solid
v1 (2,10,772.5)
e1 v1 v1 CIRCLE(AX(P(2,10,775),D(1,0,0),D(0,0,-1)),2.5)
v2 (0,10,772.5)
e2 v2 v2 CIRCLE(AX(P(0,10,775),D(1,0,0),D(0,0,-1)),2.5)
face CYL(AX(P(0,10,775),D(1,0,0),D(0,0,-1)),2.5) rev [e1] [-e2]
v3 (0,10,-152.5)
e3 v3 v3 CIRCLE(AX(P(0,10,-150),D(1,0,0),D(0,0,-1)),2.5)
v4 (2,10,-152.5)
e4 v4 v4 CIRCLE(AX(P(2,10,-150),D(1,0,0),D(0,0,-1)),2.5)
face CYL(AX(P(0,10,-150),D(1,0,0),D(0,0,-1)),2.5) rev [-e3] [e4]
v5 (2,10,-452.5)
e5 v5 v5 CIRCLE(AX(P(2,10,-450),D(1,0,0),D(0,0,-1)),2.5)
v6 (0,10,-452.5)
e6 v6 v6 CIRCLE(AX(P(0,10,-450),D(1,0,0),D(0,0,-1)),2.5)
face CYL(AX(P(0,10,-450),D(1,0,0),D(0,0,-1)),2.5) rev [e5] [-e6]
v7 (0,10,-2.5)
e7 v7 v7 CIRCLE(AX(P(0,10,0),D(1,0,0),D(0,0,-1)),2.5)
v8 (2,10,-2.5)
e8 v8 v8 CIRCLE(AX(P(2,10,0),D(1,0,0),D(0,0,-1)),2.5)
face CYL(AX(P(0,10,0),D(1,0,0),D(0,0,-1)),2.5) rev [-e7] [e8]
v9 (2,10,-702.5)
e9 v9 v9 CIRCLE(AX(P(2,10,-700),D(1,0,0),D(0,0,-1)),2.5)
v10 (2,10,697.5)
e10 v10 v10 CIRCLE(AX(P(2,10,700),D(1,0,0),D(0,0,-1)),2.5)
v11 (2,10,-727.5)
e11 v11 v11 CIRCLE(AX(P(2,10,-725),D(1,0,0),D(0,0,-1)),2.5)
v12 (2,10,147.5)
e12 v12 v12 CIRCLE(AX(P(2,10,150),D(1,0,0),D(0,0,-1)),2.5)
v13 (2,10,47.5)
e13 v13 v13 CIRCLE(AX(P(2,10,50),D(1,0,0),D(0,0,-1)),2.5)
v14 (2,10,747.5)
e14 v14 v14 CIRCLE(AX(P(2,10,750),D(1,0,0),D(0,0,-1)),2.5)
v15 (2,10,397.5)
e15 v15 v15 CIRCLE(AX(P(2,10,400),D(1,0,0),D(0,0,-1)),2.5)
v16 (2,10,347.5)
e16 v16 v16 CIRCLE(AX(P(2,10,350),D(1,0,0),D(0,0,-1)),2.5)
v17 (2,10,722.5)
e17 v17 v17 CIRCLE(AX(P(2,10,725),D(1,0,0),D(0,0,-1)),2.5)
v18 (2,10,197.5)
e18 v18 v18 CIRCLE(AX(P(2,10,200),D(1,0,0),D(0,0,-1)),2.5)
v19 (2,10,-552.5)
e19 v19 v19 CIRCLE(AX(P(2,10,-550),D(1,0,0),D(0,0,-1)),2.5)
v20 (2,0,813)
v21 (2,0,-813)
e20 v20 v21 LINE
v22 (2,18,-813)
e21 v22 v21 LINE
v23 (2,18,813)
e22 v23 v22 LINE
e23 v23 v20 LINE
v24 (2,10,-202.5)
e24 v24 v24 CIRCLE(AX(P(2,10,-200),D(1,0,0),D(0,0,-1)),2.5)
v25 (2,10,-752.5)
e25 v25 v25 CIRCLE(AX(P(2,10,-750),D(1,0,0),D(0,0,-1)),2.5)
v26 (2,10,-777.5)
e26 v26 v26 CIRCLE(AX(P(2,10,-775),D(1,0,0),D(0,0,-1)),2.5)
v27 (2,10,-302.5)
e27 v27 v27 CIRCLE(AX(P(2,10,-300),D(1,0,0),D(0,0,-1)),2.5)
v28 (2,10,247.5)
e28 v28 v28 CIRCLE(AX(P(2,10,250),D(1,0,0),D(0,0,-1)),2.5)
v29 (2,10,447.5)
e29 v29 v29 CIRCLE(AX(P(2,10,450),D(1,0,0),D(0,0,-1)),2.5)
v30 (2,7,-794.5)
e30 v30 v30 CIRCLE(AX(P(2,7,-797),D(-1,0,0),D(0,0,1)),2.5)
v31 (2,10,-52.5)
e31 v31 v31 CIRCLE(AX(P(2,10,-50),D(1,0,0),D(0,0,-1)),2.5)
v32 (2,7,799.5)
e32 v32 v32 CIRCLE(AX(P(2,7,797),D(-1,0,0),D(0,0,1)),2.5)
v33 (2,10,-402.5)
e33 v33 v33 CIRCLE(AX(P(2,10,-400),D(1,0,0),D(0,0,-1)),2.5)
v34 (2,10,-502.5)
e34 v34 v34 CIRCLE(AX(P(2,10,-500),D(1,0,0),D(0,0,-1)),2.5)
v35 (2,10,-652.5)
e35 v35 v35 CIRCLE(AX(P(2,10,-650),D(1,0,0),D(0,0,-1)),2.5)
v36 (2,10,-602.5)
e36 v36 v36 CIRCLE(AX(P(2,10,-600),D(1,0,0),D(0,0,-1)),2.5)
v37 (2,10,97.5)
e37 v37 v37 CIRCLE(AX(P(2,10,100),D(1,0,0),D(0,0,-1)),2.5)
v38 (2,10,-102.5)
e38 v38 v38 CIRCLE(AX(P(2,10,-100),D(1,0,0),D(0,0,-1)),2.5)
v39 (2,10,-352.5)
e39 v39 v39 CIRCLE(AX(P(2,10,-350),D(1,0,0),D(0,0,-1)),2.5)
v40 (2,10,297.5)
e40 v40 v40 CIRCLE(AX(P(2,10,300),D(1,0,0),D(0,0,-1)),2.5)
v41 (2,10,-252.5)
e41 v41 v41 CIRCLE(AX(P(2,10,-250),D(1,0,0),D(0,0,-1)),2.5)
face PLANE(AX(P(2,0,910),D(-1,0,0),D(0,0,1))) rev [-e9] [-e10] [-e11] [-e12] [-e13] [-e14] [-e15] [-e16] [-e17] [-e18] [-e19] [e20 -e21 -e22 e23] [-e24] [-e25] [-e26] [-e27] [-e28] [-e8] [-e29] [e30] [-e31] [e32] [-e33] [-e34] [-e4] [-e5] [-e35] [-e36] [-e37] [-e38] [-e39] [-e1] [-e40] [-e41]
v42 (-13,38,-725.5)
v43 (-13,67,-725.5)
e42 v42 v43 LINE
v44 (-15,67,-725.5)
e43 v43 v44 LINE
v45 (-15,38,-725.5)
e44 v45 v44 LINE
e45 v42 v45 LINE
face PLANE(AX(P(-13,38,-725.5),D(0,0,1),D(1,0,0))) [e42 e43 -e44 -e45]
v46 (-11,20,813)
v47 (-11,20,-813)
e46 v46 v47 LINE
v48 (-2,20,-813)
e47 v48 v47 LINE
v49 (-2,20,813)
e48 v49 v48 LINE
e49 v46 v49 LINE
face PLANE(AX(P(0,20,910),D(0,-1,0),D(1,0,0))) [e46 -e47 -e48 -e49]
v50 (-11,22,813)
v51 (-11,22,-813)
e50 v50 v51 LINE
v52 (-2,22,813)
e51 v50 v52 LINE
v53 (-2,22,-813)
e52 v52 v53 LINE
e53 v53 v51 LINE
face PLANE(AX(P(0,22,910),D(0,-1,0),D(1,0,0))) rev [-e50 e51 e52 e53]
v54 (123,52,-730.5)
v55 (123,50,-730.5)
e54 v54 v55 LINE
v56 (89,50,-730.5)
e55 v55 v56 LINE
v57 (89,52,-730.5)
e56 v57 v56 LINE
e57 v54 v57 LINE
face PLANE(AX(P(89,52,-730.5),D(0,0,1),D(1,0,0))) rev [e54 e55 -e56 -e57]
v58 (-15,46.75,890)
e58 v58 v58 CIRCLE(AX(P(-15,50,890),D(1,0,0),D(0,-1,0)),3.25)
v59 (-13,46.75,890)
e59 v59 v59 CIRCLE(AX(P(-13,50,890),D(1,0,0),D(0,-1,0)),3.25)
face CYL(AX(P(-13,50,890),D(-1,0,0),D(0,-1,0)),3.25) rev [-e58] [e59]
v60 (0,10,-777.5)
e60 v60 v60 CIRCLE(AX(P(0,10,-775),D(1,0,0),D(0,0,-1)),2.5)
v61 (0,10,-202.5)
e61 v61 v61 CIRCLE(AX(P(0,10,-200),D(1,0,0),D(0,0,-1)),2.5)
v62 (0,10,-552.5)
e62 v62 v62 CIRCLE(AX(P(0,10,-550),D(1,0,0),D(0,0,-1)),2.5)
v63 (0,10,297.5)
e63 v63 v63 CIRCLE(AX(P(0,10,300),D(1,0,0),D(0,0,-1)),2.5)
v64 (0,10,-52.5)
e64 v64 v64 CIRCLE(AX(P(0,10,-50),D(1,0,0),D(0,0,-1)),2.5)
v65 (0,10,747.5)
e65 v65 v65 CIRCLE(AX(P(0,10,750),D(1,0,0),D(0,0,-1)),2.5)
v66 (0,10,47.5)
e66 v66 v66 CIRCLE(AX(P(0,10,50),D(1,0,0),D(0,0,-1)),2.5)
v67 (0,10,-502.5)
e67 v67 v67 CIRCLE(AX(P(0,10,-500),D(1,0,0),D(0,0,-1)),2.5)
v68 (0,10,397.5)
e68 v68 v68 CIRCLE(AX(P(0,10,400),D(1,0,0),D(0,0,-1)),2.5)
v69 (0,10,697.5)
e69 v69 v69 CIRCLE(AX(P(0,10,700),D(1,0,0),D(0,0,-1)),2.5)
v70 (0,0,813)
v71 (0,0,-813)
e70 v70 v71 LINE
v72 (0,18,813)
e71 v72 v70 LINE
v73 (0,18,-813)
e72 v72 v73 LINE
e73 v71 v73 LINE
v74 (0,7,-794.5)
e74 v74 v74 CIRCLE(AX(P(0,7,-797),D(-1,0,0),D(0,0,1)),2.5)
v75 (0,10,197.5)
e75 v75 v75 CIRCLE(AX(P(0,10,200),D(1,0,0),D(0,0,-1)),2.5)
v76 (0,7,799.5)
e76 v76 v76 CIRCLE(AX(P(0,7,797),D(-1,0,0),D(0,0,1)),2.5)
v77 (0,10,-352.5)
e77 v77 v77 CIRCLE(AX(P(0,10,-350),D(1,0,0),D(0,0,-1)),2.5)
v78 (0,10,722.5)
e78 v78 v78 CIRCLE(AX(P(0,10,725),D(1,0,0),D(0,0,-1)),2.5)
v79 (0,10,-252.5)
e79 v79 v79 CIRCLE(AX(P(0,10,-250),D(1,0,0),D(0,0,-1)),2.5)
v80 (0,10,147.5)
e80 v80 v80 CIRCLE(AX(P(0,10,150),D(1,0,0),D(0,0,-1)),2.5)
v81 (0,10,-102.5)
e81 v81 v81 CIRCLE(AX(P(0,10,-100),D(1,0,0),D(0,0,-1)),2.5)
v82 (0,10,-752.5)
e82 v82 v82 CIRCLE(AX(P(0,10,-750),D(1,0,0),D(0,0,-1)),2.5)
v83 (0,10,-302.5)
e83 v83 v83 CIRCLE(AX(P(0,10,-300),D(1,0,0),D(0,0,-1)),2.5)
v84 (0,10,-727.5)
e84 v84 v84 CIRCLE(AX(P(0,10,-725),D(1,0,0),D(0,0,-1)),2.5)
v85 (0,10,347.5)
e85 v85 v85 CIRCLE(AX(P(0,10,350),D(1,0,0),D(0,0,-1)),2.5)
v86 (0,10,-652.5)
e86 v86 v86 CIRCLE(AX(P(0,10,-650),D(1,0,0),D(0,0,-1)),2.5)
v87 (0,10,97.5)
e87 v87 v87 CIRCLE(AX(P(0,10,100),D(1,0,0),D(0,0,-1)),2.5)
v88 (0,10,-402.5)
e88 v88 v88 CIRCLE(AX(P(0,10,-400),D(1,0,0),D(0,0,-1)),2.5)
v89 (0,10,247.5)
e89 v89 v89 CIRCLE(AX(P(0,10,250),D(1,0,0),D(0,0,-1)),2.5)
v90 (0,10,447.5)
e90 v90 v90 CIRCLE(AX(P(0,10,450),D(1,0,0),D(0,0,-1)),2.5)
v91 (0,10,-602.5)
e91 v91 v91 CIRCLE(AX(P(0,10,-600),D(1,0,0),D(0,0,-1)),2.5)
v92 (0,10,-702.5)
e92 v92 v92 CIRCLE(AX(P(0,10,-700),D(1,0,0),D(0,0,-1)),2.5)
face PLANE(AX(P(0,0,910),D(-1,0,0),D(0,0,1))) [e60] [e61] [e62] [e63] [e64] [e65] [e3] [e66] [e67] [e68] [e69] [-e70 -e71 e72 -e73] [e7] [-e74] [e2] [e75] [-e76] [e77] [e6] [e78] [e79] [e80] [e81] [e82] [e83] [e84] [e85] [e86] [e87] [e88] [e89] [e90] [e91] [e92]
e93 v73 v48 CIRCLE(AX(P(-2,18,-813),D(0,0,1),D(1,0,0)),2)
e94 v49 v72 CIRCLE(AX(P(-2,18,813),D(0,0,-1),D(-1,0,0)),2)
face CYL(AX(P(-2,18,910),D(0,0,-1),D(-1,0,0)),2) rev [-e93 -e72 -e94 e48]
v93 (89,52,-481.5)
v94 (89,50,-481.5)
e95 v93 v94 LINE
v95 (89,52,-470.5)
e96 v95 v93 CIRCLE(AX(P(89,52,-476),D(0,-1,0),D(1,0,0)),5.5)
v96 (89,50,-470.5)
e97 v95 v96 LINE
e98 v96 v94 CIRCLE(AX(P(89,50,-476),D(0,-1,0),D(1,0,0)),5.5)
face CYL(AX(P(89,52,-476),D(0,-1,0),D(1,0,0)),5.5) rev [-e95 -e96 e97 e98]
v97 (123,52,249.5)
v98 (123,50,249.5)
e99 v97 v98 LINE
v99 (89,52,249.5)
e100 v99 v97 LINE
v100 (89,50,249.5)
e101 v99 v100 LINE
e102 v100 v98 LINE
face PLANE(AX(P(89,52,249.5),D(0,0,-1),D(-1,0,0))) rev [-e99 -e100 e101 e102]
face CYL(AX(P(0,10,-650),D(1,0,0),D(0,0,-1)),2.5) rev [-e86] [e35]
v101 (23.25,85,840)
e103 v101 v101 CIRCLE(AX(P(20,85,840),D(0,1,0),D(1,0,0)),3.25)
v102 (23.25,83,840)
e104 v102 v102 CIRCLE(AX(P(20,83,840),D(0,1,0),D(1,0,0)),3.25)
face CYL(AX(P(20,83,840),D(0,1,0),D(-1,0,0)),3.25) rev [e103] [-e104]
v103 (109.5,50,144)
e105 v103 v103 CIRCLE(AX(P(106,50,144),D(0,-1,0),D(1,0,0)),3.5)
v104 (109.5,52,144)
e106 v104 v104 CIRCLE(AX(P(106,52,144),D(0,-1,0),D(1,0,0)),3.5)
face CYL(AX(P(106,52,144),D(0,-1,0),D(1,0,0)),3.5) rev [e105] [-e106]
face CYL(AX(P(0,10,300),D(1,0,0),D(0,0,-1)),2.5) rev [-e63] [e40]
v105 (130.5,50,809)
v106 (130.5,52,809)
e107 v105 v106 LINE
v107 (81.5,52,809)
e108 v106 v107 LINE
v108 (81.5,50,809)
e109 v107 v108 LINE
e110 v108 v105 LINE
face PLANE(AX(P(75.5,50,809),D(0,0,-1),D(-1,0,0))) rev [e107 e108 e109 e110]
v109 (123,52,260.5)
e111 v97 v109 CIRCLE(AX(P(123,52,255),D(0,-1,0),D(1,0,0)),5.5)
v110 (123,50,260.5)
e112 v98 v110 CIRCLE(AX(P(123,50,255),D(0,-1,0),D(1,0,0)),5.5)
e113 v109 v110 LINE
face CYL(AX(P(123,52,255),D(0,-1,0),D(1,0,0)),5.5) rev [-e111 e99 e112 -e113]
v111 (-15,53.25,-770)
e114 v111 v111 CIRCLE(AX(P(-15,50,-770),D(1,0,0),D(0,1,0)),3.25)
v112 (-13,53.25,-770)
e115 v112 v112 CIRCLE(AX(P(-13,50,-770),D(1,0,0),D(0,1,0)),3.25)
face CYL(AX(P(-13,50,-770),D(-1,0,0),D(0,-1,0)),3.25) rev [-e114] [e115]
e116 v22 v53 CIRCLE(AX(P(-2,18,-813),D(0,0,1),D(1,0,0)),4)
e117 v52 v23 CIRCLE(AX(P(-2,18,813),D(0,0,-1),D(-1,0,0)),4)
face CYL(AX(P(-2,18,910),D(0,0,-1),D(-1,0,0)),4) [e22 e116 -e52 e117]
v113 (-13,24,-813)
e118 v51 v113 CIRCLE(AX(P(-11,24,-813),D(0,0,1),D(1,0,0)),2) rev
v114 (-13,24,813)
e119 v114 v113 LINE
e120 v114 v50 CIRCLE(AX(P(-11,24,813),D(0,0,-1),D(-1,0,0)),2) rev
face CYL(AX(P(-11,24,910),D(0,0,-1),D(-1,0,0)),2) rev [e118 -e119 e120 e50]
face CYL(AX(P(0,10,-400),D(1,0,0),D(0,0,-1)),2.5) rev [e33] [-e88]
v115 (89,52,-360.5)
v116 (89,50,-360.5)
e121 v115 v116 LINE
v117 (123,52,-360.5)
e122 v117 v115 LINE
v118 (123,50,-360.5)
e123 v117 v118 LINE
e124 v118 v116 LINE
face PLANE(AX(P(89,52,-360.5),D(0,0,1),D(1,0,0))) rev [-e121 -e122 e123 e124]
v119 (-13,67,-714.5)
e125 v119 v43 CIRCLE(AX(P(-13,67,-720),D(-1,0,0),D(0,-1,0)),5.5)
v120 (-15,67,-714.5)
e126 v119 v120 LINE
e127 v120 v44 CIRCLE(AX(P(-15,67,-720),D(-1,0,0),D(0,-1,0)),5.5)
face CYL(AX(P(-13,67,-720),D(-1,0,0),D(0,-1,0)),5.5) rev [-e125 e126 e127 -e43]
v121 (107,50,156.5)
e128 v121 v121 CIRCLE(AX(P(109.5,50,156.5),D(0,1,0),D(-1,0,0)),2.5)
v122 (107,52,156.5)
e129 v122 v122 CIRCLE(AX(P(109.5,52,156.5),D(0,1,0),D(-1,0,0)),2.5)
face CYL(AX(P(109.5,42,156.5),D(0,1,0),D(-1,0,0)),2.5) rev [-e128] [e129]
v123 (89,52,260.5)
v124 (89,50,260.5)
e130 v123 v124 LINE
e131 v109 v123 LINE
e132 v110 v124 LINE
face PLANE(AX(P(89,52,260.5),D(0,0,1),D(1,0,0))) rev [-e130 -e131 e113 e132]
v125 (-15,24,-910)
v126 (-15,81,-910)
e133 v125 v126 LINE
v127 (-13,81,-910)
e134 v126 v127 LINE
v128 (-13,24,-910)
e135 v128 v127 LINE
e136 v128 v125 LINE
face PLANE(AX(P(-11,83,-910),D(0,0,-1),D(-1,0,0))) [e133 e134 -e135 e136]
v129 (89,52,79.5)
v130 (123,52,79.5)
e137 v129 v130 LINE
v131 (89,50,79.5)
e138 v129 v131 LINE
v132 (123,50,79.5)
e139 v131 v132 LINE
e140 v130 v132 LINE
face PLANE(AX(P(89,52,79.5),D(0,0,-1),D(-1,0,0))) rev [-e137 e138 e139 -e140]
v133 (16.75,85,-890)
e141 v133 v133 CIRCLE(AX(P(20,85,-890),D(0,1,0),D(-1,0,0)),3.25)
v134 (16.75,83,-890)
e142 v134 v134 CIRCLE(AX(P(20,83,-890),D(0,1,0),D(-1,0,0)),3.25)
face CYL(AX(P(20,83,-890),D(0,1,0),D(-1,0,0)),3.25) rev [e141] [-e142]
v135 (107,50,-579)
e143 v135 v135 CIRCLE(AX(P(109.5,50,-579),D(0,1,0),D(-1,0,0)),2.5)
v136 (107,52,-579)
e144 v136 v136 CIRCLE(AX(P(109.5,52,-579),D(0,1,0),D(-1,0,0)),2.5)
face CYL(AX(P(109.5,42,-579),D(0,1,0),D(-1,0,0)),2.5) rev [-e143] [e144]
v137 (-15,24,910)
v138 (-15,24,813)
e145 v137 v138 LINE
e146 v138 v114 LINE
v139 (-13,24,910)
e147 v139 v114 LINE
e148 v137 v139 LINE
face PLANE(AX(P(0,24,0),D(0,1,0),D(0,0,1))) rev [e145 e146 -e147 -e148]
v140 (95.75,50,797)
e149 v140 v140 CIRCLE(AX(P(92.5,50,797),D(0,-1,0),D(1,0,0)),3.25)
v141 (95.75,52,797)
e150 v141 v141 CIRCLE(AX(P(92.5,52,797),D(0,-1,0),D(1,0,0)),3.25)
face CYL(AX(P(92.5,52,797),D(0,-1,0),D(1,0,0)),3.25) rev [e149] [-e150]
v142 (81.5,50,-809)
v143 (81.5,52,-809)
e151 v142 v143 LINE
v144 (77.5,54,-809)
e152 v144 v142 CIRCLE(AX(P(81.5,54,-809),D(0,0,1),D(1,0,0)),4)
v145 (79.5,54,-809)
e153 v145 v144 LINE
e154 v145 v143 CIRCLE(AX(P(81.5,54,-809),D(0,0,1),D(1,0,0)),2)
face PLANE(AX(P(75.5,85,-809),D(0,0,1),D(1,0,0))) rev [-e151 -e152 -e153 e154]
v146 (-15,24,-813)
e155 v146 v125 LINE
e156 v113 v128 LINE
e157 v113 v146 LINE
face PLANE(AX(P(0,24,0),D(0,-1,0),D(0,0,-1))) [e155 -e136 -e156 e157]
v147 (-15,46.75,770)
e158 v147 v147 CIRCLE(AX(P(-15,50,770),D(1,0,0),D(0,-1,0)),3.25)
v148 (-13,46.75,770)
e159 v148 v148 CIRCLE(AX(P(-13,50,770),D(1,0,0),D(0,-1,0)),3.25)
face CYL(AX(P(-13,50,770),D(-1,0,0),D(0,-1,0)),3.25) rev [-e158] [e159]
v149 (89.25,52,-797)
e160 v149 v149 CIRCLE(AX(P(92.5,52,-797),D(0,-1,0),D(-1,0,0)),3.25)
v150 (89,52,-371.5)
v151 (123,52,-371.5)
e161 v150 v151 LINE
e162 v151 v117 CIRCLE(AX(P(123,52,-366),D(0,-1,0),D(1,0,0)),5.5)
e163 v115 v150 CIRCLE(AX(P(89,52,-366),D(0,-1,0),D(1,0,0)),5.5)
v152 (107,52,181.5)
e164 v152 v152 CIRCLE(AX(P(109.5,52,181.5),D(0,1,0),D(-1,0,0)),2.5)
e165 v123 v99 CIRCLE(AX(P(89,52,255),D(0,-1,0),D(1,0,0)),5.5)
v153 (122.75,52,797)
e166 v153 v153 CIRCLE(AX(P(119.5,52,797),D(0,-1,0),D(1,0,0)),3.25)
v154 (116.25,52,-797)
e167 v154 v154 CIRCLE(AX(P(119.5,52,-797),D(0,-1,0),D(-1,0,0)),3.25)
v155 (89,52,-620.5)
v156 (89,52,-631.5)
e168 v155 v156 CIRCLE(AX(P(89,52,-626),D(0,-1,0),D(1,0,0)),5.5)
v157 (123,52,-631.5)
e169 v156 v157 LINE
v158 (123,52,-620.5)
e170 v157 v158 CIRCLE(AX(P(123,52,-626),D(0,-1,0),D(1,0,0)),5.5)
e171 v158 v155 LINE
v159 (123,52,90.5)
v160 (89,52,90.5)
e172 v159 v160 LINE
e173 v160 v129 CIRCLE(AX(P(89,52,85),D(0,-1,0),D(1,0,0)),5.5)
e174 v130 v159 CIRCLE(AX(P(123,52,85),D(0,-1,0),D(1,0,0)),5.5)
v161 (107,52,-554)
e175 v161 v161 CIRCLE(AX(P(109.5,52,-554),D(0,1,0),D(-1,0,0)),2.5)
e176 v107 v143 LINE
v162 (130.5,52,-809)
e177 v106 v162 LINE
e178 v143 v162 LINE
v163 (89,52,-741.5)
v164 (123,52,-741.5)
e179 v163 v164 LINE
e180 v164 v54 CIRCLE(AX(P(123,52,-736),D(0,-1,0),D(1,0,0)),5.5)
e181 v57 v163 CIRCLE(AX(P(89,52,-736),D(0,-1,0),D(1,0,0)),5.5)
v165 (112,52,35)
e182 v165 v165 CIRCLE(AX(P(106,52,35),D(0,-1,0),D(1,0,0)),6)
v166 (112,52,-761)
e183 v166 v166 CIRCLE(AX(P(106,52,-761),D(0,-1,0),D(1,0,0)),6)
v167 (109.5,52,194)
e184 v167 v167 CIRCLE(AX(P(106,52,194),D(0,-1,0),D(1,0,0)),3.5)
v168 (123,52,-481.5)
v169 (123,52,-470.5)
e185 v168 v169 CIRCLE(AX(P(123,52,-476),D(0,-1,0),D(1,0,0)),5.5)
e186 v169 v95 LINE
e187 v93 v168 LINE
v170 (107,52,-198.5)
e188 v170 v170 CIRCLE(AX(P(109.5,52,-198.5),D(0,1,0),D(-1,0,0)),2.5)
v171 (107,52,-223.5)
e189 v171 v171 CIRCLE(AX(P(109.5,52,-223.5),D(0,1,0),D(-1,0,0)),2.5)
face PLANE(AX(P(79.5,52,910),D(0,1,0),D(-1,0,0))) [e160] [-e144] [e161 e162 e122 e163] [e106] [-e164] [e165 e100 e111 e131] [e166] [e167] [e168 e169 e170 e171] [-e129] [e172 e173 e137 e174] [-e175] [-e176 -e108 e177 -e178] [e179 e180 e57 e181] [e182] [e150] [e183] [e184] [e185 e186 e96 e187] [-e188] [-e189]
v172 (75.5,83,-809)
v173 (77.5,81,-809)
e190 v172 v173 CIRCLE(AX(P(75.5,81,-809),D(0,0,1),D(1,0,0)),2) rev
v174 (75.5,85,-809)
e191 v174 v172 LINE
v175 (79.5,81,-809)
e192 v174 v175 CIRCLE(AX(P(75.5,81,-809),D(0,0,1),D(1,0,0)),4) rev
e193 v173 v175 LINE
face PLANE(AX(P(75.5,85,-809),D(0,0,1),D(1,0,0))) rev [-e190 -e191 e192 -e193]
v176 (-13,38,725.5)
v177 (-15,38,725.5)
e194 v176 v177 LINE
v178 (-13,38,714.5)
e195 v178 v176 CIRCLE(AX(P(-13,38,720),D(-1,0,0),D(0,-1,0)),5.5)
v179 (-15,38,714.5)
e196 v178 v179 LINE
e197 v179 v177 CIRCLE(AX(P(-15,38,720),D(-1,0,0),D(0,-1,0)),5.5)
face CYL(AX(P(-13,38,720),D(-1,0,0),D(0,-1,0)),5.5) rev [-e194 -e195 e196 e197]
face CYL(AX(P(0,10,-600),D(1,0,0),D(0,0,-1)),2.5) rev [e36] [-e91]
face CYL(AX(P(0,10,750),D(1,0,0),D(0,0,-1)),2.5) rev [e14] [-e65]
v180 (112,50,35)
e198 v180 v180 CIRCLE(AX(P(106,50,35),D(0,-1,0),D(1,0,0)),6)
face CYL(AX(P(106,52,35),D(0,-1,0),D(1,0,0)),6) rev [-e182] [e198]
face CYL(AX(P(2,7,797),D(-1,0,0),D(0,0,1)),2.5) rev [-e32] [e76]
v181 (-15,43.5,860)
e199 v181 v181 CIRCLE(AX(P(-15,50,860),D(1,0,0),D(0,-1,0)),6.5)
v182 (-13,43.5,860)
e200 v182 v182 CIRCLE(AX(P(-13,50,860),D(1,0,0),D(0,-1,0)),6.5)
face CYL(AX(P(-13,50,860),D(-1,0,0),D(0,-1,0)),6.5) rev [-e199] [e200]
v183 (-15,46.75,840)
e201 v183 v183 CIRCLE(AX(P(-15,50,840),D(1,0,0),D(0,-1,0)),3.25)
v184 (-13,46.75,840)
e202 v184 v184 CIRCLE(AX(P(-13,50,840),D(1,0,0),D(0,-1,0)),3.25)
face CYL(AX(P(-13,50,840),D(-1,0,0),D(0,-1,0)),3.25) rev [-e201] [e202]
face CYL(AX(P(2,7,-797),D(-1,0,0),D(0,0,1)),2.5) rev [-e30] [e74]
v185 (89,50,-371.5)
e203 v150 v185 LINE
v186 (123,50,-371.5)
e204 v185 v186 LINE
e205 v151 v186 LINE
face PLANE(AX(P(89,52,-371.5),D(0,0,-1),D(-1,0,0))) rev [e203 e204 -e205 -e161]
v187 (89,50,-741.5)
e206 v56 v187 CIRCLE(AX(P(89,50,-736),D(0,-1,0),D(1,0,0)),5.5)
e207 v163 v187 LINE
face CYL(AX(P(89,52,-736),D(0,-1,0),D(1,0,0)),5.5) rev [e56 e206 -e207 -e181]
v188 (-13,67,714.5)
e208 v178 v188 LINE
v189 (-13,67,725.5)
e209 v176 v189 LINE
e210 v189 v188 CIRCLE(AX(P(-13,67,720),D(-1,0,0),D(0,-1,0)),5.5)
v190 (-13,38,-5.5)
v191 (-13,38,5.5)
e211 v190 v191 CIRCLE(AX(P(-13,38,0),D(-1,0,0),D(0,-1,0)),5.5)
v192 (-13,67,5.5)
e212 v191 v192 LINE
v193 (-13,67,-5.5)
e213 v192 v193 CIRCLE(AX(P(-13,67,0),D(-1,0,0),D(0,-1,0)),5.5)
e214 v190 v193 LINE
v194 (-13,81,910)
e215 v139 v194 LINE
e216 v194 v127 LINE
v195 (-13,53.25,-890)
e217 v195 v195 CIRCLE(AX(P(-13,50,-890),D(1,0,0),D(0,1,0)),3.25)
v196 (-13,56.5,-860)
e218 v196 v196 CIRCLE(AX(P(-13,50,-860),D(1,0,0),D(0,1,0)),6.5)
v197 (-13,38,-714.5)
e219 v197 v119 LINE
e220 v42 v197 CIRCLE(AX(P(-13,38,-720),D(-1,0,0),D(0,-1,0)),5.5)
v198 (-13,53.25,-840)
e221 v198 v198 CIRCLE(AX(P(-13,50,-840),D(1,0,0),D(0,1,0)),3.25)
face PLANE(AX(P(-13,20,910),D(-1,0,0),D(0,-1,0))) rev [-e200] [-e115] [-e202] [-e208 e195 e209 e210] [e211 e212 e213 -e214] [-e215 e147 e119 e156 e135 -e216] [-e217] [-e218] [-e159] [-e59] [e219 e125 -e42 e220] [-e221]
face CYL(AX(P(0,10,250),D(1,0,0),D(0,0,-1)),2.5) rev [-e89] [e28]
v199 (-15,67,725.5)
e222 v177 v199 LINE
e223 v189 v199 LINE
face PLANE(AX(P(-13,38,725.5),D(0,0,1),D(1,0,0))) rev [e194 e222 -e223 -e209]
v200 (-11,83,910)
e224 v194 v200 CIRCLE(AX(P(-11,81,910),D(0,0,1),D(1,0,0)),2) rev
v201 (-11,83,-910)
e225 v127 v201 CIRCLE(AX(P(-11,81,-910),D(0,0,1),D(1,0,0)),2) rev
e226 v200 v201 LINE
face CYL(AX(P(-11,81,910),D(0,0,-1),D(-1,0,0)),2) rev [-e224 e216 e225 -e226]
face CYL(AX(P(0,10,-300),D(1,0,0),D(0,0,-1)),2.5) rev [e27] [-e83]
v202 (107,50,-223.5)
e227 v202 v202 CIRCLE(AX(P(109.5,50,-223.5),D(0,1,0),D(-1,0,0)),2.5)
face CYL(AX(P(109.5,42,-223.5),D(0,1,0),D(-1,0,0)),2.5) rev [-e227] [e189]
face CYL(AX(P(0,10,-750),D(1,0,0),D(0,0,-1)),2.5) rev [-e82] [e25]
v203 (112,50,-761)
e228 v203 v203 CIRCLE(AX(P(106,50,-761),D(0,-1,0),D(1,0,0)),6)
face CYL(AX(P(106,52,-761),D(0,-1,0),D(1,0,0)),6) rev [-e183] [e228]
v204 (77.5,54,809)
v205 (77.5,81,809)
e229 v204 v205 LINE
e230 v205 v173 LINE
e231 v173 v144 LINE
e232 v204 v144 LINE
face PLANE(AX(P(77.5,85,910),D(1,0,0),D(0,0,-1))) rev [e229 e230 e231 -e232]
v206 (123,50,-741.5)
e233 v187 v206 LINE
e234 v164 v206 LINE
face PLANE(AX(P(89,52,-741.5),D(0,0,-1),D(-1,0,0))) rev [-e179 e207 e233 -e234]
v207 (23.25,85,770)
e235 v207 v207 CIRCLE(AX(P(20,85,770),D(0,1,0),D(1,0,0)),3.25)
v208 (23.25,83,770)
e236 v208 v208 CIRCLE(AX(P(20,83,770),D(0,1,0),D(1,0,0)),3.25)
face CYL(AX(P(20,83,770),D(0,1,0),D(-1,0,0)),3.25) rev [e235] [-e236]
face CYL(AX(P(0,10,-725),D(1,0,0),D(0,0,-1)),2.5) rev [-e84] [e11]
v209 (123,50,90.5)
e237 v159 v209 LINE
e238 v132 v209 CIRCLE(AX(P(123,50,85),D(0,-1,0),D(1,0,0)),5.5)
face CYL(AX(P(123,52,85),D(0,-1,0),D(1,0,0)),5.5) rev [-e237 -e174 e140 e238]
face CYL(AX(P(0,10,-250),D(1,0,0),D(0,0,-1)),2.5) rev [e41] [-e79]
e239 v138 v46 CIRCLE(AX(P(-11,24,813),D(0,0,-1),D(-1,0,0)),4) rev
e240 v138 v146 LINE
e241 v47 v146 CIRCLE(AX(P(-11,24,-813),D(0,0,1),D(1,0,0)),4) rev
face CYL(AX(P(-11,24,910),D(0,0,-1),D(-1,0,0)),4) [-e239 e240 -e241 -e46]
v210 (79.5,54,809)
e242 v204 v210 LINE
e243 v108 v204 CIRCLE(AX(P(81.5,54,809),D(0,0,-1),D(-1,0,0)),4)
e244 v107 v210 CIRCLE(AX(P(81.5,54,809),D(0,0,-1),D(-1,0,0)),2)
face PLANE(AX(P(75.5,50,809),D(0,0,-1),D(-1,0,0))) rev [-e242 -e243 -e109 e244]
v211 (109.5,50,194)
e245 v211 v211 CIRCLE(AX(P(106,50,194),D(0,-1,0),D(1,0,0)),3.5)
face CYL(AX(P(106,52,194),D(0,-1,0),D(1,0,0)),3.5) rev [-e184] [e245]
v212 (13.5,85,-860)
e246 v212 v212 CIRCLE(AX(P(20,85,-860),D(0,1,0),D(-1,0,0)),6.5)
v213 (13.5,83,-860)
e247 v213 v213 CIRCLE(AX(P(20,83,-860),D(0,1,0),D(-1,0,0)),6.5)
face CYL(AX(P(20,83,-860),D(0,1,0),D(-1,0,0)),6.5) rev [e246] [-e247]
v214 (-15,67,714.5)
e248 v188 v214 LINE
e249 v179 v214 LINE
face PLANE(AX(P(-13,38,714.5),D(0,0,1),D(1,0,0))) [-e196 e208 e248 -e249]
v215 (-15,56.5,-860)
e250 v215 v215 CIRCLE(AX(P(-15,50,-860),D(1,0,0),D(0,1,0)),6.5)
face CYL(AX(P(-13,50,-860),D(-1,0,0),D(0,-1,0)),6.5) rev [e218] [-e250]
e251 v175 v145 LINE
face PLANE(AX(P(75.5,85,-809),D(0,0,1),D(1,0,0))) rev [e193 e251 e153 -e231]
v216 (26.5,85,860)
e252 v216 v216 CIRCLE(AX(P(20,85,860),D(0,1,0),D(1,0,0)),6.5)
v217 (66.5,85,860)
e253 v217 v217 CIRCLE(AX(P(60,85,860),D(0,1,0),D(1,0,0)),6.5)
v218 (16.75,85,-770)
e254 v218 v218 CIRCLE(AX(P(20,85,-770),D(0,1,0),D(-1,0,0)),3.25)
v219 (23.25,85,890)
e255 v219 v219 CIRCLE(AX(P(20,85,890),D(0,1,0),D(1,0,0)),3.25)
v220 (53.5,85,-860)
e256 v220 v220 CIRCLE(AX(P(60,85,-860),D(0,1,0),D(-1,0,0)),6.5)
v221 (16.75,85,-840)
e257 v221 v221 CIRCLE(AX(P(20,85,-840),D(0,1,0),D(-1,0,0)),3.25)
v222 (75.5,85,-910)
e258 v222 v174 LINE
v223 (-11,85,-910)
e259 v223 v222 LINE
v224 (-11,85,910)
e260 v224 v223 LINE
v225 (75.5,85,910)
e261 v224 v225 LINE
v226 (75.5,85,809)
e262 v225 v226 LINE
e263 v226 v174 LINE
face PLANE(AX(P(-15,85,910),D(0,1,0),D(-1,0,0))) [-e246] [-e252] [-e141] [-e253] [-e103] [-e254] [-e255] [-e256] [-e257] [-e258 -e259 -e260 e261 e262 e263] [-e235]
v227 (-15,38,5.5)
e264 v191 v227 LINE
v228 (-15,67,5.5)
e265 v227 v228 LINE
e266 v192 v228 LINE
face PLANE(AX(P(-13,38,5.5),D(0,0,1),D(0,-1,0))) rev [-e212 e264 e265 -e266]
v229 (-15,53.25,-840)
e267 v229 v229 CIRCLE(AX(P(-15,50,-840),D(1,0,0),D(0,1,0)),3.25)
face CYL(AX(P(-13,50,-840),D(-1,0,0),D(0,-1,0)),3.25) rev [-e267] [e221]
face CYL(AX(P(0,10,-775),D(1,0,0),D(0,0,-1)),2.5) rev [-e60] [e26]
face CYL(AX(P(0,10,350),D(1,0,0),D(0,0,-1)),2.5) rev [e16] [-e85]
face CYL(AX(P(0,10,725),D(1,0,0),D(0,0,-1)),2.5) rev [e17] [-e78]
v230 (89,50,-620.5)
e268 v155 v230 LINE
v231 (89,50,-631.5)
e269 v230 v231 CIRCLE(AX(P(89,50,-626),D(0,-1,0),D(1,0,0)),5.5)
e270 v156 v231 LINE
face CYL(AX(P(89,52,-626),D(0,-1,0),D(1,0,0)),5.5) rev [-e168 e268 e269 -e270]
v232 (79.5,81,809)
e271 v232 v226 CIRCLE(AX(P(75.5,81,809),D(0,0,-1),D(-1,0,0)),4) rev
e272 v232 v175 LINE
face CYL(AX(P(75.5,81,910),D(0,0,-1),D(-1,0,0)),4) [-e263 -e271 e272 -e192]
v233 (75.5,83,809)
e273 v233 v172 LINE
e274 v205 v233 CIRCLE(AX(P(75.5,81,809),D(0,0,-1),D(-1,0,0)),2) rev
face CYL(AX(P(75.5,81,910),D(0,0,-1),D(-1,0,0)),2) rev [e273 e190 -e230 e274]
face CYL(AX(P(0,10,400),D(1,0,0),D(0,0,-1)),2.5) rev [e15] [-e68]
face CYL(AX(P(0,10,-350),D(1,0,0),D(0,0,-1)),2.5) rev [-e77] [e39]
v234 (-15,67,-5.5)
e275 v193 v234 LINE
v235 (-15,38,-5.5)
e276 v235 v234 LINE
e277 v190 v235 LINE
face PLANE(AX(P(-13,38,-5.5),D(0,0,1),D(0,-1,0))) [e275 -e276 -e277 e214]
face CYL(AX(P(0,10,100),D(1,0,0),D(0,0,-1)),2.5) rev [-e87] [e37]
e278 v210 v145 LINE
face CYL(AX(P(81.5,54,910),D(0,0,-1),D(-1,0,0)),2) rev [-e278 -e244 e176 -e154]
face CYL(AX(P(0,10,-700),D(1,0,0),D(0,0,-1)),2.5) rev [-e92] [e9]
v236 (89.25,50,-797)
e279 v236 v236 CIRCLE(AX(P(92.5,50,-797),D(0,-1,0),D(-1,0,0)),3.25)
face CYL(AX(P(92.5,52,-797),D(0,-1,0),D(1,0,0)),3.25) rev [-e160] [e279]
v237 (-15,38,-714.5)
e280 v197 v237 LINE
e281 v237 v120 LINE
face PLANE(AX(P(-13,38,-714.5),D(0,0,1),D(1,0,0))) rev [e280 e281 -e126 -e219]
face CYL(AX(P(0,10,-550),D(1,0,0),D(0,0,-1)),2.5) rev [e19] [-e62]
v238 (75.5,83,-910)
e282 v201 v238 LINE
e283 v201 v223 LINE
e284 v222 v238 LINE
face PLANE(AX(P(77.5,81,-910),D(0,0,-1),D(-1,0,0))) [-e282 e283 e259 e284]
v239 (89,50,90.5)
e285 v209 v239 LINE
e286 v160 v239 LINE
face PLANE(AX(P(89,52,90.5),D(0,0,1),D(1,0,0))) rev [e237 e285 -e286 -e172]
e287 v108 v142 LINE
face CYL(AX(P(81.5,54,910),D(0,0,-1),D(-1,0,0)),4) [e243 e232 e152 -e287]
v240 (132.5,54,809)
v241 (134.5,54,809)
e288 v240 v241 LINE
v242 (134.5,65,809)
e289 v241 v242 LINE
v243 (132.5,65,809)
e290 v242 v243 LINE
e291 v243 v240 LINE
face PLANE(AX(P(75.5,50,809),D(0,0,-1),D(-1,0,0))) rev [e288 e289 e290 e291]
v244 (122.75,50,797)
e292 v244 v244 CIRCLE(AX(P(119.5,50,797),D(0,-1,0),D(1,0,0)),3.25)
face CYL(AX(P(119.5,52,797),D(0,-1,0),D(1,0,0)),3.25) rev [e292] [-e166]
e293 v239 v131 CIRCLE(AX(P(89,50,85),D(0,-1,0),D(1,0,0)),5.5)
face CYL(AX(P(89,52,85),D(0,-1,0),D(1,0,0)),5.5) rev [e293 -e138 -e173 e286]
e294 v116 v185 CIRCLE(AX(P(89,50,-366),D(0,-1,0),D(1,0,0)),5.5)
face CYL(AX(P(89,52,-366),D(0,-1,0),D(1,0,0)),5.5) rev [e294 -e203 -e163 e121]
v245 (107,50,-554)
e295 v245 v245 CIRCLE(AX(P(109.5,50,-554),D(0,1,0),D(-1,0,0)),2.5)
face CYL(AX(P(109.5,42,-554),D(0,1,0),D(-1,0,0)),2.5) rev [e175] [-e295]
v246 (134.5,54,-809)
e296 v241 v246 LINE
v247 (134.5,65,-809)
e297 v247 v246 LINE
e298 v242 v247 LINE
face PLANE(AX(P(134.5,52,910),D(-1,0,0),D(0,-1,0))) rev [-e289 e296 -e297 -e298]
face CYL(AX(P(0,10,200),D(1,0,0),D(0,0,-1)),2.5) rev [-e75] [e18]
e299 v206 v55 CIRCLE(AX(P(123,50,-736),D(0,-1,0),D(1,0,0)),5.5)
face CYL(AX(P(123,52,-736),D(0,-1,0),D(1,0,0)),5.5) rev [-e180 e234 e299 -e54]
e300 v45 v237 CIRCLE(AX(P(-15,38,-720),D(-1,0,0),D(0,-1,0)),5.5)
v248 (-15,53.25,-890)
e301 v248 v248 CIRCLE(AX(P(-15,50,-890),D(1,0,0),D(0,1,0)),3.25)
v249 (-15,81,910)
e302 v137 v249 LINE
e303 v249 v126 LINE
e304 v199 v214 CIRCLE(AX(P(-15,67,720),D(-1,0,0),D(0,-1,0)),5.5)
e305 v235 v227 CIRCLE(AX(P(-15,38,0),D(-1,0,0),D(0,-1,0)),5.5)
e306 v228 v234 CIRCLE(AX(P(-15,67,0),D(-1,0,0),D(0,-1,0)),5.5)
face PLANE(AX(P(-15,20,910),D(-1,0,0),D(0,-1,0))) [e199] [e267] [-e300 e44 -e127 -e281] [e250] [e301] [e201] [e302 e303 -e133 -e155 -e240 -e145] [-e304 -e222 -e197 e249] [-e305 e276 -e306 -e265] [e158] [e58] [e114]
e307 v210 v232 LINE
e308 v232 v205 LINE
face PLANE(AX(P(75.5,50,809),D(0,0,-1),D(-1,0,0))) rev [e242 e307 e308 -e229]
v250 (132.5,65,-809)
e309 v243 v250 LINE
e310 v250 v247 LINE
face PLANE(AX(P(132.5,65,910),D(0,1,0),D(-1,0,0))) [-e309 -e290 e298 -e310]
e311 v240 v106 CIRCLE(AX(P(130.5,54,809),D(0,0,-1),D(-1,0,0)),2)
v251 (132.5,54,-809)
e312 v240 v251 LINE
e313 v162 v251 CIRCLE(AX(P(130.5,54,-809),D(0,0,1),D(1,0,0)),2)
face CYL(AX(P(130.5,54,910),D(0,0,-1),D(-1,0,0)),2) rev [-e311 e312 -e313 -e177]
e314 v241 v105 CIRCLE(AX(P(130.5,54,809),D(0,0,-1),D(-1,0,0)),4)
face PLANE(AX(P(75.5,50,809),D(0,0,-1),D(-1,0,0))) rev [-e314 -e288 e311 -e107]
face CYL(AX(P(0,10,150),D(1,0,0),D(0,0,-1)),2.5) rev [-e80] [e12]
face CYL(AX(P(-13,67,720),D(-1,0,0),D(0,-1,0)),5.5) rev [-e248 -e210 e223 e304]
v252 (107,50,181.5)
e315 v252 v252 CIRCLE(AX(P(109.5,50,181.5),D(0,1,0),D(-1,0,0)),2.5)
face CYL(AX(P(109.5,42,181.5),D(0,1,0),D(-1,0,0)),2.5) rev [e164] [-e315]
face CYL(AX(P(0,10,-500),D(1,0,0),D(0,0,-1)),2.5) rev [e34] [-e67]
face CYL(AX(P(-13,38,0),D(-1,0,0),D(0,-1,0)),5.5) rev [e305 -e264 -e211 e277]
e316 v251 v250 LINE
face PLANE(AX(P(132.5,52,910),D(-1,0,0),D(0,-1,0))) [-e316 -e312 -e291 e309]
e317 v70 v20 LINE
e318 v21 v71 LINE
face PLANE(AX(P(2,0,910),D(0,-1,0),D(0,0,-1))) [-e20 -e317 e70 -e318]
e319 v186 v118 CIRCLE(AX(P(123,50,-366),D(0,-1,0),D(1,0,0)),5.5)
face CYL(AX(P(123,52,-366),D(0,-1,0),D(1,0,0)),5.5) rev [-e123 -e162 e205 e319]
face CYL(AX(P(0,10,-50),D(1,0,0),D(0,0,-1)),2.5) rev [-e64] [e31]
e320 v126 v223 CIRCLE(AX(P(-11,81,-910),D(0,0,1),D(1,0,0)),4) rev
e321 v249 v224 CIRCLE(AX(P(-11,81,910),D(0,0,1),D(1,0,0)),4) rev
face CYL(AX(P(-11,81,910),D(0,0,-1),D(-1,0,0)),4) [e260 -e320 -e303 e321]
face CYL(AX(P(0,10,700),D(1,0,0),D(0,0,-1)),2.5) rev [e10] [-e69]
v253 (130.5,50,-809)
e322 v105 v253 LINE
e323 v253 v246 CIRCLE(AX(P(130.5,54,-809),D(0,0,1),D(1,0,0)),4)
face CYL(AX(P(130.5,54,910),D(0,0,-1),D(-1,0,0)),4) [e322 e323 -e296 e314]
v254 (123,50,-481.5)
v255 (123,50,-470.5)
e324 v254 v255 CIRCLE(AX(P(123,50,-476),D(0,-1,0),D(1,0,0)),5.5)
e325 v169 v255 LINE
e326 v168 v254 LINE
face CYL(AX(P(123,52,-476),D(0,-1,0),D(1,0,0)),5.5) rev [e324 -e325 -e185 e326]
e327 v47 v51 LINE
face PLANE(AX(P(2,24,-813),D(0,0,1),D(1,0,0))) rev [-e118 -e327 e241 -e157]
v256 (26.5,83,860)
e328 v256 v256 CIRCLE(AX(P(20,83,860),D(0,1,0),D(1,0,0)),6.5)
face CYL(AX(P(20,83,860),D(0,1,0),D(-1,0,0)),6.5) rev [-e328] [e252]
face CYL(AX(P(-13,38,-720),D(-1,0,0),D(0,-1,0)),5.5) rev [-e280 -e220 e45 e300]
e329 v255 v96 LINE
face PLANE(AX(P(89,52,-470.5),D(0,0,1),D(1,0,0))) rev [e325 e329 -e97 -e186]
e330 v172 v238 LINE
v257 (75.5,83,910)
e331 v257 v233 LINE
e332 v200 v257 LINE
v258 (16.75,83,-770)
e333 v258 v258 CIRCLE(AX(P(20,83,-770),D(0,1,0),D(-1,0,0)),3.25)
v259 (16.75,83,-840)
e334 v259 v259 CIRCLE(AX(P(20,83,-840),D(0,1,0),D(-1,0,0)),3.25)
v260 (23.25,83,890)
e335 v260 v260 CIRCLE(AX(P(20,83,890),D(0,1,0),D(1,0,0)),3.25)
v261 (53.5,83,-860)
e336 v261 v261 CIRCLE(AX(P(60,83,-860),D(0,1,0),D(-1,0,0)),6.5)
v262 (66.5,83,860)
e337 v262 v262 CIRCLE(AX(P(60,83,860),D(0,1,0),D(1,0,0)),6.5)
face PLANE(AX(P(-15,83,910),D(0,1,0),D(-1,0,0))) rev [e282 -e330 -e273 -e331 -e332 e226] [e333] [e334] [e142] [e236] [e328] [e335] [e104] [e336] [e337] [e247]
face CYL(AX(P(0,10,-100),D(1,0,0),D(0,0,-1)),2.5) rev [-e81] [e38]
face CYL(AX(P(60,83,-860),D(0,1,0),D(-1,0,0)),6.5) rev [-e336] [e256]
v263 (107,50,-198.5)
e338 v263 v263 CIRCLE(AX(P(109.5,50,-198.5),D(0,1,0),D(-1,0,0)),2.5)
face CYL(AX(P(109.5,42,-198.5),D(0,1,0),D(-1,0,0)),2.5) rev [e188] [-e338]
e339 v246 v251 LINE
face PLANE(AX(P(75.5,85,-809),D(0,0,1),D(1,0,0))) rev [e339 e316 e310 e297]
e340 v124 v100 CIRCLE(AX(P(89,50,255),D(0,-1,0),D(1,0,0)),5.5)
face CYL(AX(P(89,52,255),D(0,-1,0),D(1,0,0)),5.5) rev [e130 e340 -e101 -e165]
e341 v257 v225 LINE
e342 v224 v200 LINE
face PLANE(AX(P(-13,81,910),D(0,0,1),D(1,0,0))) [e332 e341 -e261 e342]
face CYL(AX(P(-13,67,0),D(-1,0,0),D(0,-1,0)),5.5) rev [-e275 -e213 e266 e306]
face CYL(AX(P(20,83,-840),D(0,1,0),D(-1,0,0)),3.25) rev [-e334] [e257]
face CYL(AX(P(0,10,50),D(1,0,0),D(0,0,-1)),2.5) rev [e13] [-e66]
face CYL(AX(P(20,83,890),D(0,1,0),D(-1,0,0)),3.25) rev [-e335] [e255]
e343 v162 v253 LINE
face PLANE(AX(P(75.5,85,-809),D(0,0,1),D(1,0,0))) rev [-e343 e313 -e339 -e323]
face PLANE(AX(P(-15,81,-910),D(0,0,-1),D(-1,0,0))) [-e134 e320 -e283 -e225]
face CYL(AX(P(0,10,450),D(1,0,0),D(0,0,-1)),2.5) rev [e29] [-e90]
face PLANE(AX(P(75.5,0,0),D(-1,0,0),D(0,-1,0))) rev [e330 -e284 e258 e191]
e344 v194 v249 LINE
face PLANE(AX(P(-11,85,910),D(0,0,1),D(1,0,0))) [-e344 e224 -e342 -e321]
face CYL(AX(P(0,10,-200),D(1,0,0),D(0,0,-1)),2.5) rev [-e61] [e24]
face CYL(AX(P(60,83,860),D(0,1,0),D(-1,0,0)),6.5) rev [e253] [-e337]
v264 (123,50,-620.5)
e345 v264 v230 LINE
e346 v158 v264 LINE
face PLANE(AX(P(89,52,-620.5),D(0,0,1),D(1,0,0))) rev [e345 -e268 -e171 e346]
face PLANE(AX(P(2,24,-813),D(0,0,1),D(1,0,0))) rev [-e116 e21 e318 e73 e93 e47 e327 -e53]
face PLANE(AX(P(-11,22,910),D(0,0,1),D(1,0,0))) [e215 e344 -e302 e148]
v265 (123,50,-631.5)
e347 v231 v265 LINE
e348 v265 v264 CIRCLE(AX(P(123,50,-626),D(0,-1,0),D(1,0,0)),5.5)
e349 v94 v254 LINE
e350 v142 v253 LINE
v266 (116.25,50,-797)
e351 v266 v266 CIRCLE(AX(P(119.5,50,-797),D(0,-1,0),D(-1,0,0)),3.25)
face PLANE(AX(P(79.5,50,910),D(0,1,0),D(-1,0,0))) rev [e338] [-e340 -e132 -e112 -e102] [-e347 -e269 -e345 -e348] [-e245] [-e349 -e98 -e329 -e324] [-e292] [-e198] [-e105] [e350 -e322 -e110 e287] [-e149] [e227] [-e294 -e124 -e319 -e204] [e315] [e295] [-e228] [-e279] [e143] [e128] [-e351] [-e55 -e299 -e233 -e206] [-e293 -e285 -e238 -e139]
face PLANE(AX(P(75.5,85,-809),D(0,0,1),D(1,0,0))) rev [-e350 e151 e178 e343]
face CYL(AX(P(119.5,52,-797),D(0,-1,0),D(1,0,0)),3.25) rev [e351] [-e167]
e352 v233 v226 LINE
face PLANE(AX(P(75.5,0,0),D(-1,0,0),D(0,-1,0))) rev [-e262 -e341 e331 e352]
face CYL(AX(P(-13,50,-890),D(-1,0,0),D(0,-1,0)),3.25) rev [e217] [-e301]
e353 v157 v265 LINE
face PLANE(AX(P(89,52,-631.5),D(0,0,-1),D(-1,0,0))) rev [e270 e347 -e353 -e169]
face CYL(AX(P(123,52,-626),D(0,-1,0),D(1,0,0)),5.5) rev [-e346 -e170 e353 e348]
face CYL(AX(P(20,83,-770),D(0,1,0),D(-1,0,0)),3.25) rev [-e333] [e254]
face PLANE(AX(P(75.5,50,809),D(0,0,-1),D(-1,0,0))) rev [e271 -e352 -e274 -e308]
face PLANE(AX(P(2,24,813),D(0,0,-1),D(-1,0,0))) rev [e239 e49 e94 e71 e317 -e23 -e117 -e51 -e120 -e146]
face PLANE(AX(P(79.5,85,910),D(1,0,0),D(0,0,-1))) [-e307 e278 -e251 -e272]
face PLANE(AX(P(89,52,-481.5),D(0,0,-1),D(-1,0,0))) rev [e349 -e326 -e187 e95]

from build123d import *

# Parameters (mm, degrees)
SM_BASE_FLANGE_1_DEPTH = 910
SKETCH_6_W             = 17
SKETCH_6_H             = 97
CUT_EXTRUDE_1_DEPTH    = 24
SKETCH_7_W             = 101
SKETCH_7_H             = 35
CUT_EXTRUDE_2_DEPTH    = 59
CUT_EXTRUDE_3_DEPTH    = 10
SKETCH_9_R             = 3.5
SKETCH_9_R_2           = 6
CUT_EXTRUDE_3433_DEPTH = 10
SKETCH_10_R            = 3.25
SKETCH_10_R_2          = 6.5
CUT_EXTRUDE_5_DEPTH    = 10
SKETCH_11_R            = 2.5
CUT_EXTRUDE_6_DEPTH    = 10
SKETCH_12_R            = 3.25
CUT_EXTRUDE_7_DEPTH    = 10
SKETCH_13_R            = 2.5
CUT_EXTRUDE_8_DEPTH    = 10
SKETCH_16_R            = 2.5
CUT_EXTRUDE_11_DEPTH   = 10


# Sheet-metal steps are written as plain solids
with BuildPart() as part:
    # Sketch 1 → Базовая кромка1 (new, symmetric)
    with BuildSketch(Plane.XY):
        with BuildLine():
            Line((0, 0), (0, 18))
            ThreePointArc((0, 18), (-0.585786438, 19.414213562), (-2, 20))
            Line((-2, 20), (-11, 20))
            ThreePointArc((-11, 20), (-13.828427125, 21.171572875), (-15, 24))
            Line((-15, 24), (-15, 81))
            ThreePointArc((-15, 81), (-13.828427125, 83.828427125), (-11, 85))
            Line((-11, 85), (75.5, 85))
            ThreePointArc((75.5, 85), (78.328427125, 83.828427125), (79.5, 81))
            Line((79.5, 81), (79.5, 54))
            ThreePointArc((79.5, 54), (80.085786438, 52.585786438), (81.5, 52))
            Line((81.5, 52), (130.5, 52))
            ThreePointArc((130.5, 52), (131.914213562, 52.585786438), (132.5, 54))
            Line((132.5, 54), (132.5, 65))
            Line((132.5, 65), (134.5, 65))
            Line((134.5, 65), (134.5, 54))
            ThreePointArc((134.5, 54), (133.328427125, 51.171572875), (130.5, 50))
            Line((130.5, 50), (81.5, 50))
            ThreePointArc((81.5, 50), (78.671572875, 51.171572875), (77.5, 54))
            Line((77.5, 54), (77.5, 81))
            ThreePointArc((77.5, 81), (76.914213562, 82.414213562), (75.5, 83))
            Line((75.5, 83), (-11, 83))
            ThreePointArc((-11, 83), (-12.414213562, 82.414213562), (-13, 81))
            Line((-13, 81), (-13, 24))
            ThreePointArc((-13, 24), (-12.414213562, 22.585786438), (-11, 22))
            Line((-11, 22), (-2, 22))
            ThreePointArc((-2, 22), (0.828427125, 20.828427125), (2, 18))
            Line((2, 18), (2, 0))
            Line((2, 0), (0, 0))
        make_face()
    extrude(amount=SM_BASE_FLANGE_1_DEPTH, both=True)

    # Эскиз6 → Вырез-Вытянуть1 (cut)
    with BuildSketch(Plane.XZ):
        with Locations((-6.5, 861.5)):
            Rectangle(SKETCH_6_W, SKETCH_6_H)
        with Locations((-6.5, -861.5)):
            Rectangle(SKETCH_6_W, SKETCH_6_H)
    extrude(amount=-CUT_EXTRUDE_1_DEPTH, mode=Mode.SUBTRACT)

    # Эскиз7 → Вырез-Вытянуть2 (cut)
    with BuildSketch(Plane(origin=(134.5, 0, 0), x_dir=(0, 0, -1), z_dir=(1, 0, 0))):
        with Locations((859.5, 67.5)):
            Rectangle(SKETCH_7_W, SKETCH_7_H)
        with Locations((-859.5, 67.5)):
            Rectangle(SKETCH_7_W, SKETCH_7_H)
    extrude(amount=-CUT_EXTRUDE_2_DEPTH, mode=Mode.SUBTRACT)

    # Эскиз8 → Вырез-Вытянуть3 (cut)
    with BuildSketch(Plane.ZY.offset(15)):
        with BuildLine():
            Line((-5.5, 38), (-5.5, 67))
            ThreePointArc((-5.5, 67), (0, 72.5), (5.5, 67))
            Line((5.5, 67), (5.5, 38))
            ThreePointArc((5.5, 38), (0, 32.5), (-5.5, 38))
        make_face()
        with BuildLine():
            Line((-725.5, 38), (-725.5, 67))
            ThreePointArc((-725.5, 67), (-720, 72.5), (-714.5, 67))
            Line((-714.5, 67), (-714.5, 38))
            ThreePointArc((-714.5, 38), (-720, 32.5), (-725.5, 38))
        make_face()
        with BuildLine():
            Line((714.5, 38), (714.5, 67))
            ThreePointArc((714.5, 67), (720, 72.5), (725.5, 67))
            Line((725.5, 67), (725.5, 38))
            ThreePointArc((725.5, 38), (720, 32.5), (714.5, 38))
        make_face()
    extrude(amount=-CUT_EXTRUDE_3_DEPTH, mode=Mode.SUBTRACT)

    # Эскиз9 → Cut-Extrude 3433 (cut)
    with BuildSketch(Plane.XZ.offset(-50)):
        with Locations((106, 194)):
            Circle(SKETCH_9_R)
        with Locations((106, 144)):
            Circle(SKETCH_9_R)
        with Locations((106, 35)):
            Circle(SKETCH_9_R_2)
        with Locations((106, -761)):
            Circle(SKETCH_9_R_2)
        with BuildLine():
            Line((89, 90.5), (123, 90.5))
            ThreePointArc((123, 90.5), (128.5, 85), (123, 79.5))
            Line((123, 79.5), (89, 79.5))
            ThreePointArc((89, 79.5), (83.5, 85), (89, 90.5))
        make_face()
        with BuildLine():
            Line((89, 260.5), (123, 260.5))
            ThreePointArc((123, 260.5), (128.5, 255), (123, 249.5))
            Line((123, 249.5), (89, 249.5))
            ThreePointArc((89, 249.5), (83.5, 255), (89, 260.5))
        make_face()
        with BuildLine():
            Line((89, -360.5), (123, -360.5))
            ThreePointArc((123, -360.5), (128.5, -366), (123, -371.5))
            Line((123, -371.5), (89, -371.5))
            ThreePointArc((89, -371.5), (83.5, -366), (89, -360.5))
        make_face()
        with BuildLine():
            Line((89, -470.5), (123, -470.5))
            ThreePointArc((123, -470.5), (128.5, -476), (123, -481.5))
            Line((123, -481.5), (89, -481.5))
            ThreePointArc((89, -481.5), (83.5, -476), (89, -470.5))
        make_face()
        with BuildLine():
            Line((89, -620.5), (123, -620.5))
            ThreePointArc((123, -620.5), (128.5, -626), (123, -631.5))
            Line((123, -631.5), (89, -631.5))
            ThreePointArc((89, -631.5), (83.5, -626), (89, -620.5))
        make_face()
        with BuildLine():
            Line((89, -730.5), (123, -730.5))
            ThreePointArc((123, -730.5), (128.5, -736), (123, -741.5))
            Line((123, -741.5), (89, -741.5))
            ThreePointArc((89, -741.5), (83.5, -736), (89, -730.5))
        make_face()
    extrude(amount=-CUT_EXTRUDE_3433_DEPTH, mode=Mode.SUBTRACT)

    # Эскиз10 → Вырез-Вытянуть5 (cut)
    with BuildSketch(Plane(origin=(0, 85, 0), x_dir=(1, 0, 0), z_dir=(0, 1, 0))):
        with Locations(Location((20, 890, 0), (0, 0, 180))):
            Circle(SKETCH_10_R)
        with Locations(Location((20, 860, 0), (0, 0, 180))):
            Circle(SKETCH_10_R_2)
        with Locations(Location((20, 840, 0), (0, 0, 180))):
            Circle(SKETCH_10_R)
        with Locations(Location((60, 860, 0), (0, 0, 180))):
            Circle(SKETCH_10_R_2)
        with Locations(Location((20, 770, 0), (0, 0, 180))):
            Circle(SKETCH_10_R)
        with Locations((20, -770)):
            Circle(SKETCH_10_R)
        with Locations((60, -860)):
            Circle(SKETCH_10_R_2)
        with Locations((20, -840)):
            Circle(SKETCH_10_R)
        with Locations((20, -860)):
            Circle(SKETCH_10_R_2)
        with Locations((20, -890)):
            Circle(SKETCH_10_R)
    cut_extrude_5 = extrude(amount=-CUT_EXTRUDE_5_DEPTH, mode=Mode.SUBTRACT)

    # Зеркальное отражение1: Вырез-Вытянуть5 across plane
    add(cut_extrude_5.mirror(Plane(origin=(35, 35, 0), x_dir=(0, 0, 1), z_dir=(-0.7071067811865499, -0.7071067811865452, 0))), mode=Mode.SUBTRACT)

    # Эскиз11 → Вырез-Вытянуть6 (cut)
    with BuildSketch(Plane.ZY):
        with Locations((-797, 7)):
            Circle(SKETCH_11_R)
        with Locations((797, 7)):
            Circle(SKETCH_11_R)
    extrude(amount=-CUT_EXTRUDE_6_DEPTH, mode=Mode.SUBTRACT)

    # Эскиз12 → Вырез-Вытянуть7 (cut)
    with BuildSketch(Plane.XZ.offset(-50)):
        with Locations((92.5, 797)):
            Circle(SKETCH_12_R)
        with Locations((119.5, 797)):
            Circle(SKETCH_12_R)
        with Locations(Location((119.5, -797, 0), (0, 0, 180))):
            Circle(SKETCH_12_R)
        with Locations(Location((92.5, -797, 0), (0, 0, 180))):
            Circle(SKETCH_12_R)
    extrude(amount=-CUT_EXTRUDE_7_DEPTH, mode=Mode.SUBTRACT)

    # Эскиз13 → Вырез-Вытянуть8 (cut)
    with BuildSketch(Plane(origin=(2, 0, 0), x_dir=(0, 0, -1), z_dir=(1, 0, 0))):
        with Locations((775, 10)):
            Circle(SKETCH_13_R)
        with Locations((750, 10)):
            Circle(SKETCH_13_R)
        with Locations((725, 10)):
            Circle(SKETCH_13_R)
        with Locations((700, 10)):
            Circle(SKETCH_13_R)
        with Locations((650, 10)):
            Circle(SKETCH_13_R)
        with Locations((600, 10)):
            Circle(SKETCH_13_R)
        with Locations((550, 10)):
            Circle(SKETCH_13_R)
        with Locations((500, 10)):
            Circle(SKETCH_13_R)
        with Locations((450, 10)):
            Circle(SKETCH_13_R)
        with Locations((400, 10)):
            Circle(SKETCH_13_R)
        with Locations((350, 10)):
            Circle(SKETCH_13_R)
        with Locations((300, 10)):
            Circle(SKETCH_13_R)
        with Locations((250, 10)):
            Circle(SKETCH_13_R)
        with Locations((200, 10)):
            Circle(SKETCH_13_R)
        with Locations((150, 10)):
            Circle(SKETCH_13_R)
        with Locations((100, 10)):
            Circle(SKETCH_13_R)
        with Locations((50, 10)):
            Circle(SKETCH_13_R)
        with Locations((0, 10)):
            Circle(SKETCH_13_R)
        with Locations((-50, 10)):
            Circle(SKETCH_13_R)
        with Locations((-100, 10)):
            Circle(SKETCH_13_R)
        with Locations((-150, 10)):
            Circle(SKETCH_13_R)
        with Locations((-200, 10)):
            Circle(SKETCH_13_R)
        with Locations((-775, 10)):
            Circle(SKETCH_13_R)
        with Locations((-750, 10)):
            Circle(SKETCH_13_R)
        with Locations((-725, 10)):
            Circle(SKETCH_13_R)
        with Locations((-700, 10)):
            Circle(SKETCH_13_R)
        with Locations((-250, 10)):
            Circle(SKETCH_13_R)
        with Locations((-300, 10)):
            Circle(SKETCH_13_R)
        with Locations((-350, 10)):
            Circle(SKETCH_13_R)
        with Locations((-400, 10)):
            Circle(SKETCH_13_R)
        with Locations((-450, 10)):
            Circle(SKETCH_13_R)
    extrude(amount=-CUT_EXTRUDE_8_DEPTH, mode=Mode.SUBTRACT)

    # Эскиз16 → Вырез-Вытянуть11 (cut)
    with BuildSketch(Plane(origin=(0, 52, 0), x_dir=(1, 0, 0), z_dir=(0, 1, 0))):
        with Locations(Location((109.5, 579, 0), (0, 0, 180))):
            Circle(SKETCH_16_R)
        with Locations(Location((109.5, 554, 0), (0, 0, 180))):
            Circle(SKETCH_16_R)
        with Locations(Location((109.5, 223.5, 0), (0, 0, 180))):
            Circle(SKETCH_16_R)
        with Locations(Location((109.5, 198.5, 0), (0, 0, 180))):
            Circle(SKETCH_16_R)
        with Locations(Location((109.5, -156.5, 0), (0, 0, 180))):
            Circle(SKETCH_16_R)
        with Locations(Location((109.5, -181.5, 0), (0, 0, 180))):
            Circle(SKETCH_16_R)
    extrude(amount=-CUT_EXTRUDE_11_DEPTH, mode=Mode.SUBTRACT)


solid = part.part
